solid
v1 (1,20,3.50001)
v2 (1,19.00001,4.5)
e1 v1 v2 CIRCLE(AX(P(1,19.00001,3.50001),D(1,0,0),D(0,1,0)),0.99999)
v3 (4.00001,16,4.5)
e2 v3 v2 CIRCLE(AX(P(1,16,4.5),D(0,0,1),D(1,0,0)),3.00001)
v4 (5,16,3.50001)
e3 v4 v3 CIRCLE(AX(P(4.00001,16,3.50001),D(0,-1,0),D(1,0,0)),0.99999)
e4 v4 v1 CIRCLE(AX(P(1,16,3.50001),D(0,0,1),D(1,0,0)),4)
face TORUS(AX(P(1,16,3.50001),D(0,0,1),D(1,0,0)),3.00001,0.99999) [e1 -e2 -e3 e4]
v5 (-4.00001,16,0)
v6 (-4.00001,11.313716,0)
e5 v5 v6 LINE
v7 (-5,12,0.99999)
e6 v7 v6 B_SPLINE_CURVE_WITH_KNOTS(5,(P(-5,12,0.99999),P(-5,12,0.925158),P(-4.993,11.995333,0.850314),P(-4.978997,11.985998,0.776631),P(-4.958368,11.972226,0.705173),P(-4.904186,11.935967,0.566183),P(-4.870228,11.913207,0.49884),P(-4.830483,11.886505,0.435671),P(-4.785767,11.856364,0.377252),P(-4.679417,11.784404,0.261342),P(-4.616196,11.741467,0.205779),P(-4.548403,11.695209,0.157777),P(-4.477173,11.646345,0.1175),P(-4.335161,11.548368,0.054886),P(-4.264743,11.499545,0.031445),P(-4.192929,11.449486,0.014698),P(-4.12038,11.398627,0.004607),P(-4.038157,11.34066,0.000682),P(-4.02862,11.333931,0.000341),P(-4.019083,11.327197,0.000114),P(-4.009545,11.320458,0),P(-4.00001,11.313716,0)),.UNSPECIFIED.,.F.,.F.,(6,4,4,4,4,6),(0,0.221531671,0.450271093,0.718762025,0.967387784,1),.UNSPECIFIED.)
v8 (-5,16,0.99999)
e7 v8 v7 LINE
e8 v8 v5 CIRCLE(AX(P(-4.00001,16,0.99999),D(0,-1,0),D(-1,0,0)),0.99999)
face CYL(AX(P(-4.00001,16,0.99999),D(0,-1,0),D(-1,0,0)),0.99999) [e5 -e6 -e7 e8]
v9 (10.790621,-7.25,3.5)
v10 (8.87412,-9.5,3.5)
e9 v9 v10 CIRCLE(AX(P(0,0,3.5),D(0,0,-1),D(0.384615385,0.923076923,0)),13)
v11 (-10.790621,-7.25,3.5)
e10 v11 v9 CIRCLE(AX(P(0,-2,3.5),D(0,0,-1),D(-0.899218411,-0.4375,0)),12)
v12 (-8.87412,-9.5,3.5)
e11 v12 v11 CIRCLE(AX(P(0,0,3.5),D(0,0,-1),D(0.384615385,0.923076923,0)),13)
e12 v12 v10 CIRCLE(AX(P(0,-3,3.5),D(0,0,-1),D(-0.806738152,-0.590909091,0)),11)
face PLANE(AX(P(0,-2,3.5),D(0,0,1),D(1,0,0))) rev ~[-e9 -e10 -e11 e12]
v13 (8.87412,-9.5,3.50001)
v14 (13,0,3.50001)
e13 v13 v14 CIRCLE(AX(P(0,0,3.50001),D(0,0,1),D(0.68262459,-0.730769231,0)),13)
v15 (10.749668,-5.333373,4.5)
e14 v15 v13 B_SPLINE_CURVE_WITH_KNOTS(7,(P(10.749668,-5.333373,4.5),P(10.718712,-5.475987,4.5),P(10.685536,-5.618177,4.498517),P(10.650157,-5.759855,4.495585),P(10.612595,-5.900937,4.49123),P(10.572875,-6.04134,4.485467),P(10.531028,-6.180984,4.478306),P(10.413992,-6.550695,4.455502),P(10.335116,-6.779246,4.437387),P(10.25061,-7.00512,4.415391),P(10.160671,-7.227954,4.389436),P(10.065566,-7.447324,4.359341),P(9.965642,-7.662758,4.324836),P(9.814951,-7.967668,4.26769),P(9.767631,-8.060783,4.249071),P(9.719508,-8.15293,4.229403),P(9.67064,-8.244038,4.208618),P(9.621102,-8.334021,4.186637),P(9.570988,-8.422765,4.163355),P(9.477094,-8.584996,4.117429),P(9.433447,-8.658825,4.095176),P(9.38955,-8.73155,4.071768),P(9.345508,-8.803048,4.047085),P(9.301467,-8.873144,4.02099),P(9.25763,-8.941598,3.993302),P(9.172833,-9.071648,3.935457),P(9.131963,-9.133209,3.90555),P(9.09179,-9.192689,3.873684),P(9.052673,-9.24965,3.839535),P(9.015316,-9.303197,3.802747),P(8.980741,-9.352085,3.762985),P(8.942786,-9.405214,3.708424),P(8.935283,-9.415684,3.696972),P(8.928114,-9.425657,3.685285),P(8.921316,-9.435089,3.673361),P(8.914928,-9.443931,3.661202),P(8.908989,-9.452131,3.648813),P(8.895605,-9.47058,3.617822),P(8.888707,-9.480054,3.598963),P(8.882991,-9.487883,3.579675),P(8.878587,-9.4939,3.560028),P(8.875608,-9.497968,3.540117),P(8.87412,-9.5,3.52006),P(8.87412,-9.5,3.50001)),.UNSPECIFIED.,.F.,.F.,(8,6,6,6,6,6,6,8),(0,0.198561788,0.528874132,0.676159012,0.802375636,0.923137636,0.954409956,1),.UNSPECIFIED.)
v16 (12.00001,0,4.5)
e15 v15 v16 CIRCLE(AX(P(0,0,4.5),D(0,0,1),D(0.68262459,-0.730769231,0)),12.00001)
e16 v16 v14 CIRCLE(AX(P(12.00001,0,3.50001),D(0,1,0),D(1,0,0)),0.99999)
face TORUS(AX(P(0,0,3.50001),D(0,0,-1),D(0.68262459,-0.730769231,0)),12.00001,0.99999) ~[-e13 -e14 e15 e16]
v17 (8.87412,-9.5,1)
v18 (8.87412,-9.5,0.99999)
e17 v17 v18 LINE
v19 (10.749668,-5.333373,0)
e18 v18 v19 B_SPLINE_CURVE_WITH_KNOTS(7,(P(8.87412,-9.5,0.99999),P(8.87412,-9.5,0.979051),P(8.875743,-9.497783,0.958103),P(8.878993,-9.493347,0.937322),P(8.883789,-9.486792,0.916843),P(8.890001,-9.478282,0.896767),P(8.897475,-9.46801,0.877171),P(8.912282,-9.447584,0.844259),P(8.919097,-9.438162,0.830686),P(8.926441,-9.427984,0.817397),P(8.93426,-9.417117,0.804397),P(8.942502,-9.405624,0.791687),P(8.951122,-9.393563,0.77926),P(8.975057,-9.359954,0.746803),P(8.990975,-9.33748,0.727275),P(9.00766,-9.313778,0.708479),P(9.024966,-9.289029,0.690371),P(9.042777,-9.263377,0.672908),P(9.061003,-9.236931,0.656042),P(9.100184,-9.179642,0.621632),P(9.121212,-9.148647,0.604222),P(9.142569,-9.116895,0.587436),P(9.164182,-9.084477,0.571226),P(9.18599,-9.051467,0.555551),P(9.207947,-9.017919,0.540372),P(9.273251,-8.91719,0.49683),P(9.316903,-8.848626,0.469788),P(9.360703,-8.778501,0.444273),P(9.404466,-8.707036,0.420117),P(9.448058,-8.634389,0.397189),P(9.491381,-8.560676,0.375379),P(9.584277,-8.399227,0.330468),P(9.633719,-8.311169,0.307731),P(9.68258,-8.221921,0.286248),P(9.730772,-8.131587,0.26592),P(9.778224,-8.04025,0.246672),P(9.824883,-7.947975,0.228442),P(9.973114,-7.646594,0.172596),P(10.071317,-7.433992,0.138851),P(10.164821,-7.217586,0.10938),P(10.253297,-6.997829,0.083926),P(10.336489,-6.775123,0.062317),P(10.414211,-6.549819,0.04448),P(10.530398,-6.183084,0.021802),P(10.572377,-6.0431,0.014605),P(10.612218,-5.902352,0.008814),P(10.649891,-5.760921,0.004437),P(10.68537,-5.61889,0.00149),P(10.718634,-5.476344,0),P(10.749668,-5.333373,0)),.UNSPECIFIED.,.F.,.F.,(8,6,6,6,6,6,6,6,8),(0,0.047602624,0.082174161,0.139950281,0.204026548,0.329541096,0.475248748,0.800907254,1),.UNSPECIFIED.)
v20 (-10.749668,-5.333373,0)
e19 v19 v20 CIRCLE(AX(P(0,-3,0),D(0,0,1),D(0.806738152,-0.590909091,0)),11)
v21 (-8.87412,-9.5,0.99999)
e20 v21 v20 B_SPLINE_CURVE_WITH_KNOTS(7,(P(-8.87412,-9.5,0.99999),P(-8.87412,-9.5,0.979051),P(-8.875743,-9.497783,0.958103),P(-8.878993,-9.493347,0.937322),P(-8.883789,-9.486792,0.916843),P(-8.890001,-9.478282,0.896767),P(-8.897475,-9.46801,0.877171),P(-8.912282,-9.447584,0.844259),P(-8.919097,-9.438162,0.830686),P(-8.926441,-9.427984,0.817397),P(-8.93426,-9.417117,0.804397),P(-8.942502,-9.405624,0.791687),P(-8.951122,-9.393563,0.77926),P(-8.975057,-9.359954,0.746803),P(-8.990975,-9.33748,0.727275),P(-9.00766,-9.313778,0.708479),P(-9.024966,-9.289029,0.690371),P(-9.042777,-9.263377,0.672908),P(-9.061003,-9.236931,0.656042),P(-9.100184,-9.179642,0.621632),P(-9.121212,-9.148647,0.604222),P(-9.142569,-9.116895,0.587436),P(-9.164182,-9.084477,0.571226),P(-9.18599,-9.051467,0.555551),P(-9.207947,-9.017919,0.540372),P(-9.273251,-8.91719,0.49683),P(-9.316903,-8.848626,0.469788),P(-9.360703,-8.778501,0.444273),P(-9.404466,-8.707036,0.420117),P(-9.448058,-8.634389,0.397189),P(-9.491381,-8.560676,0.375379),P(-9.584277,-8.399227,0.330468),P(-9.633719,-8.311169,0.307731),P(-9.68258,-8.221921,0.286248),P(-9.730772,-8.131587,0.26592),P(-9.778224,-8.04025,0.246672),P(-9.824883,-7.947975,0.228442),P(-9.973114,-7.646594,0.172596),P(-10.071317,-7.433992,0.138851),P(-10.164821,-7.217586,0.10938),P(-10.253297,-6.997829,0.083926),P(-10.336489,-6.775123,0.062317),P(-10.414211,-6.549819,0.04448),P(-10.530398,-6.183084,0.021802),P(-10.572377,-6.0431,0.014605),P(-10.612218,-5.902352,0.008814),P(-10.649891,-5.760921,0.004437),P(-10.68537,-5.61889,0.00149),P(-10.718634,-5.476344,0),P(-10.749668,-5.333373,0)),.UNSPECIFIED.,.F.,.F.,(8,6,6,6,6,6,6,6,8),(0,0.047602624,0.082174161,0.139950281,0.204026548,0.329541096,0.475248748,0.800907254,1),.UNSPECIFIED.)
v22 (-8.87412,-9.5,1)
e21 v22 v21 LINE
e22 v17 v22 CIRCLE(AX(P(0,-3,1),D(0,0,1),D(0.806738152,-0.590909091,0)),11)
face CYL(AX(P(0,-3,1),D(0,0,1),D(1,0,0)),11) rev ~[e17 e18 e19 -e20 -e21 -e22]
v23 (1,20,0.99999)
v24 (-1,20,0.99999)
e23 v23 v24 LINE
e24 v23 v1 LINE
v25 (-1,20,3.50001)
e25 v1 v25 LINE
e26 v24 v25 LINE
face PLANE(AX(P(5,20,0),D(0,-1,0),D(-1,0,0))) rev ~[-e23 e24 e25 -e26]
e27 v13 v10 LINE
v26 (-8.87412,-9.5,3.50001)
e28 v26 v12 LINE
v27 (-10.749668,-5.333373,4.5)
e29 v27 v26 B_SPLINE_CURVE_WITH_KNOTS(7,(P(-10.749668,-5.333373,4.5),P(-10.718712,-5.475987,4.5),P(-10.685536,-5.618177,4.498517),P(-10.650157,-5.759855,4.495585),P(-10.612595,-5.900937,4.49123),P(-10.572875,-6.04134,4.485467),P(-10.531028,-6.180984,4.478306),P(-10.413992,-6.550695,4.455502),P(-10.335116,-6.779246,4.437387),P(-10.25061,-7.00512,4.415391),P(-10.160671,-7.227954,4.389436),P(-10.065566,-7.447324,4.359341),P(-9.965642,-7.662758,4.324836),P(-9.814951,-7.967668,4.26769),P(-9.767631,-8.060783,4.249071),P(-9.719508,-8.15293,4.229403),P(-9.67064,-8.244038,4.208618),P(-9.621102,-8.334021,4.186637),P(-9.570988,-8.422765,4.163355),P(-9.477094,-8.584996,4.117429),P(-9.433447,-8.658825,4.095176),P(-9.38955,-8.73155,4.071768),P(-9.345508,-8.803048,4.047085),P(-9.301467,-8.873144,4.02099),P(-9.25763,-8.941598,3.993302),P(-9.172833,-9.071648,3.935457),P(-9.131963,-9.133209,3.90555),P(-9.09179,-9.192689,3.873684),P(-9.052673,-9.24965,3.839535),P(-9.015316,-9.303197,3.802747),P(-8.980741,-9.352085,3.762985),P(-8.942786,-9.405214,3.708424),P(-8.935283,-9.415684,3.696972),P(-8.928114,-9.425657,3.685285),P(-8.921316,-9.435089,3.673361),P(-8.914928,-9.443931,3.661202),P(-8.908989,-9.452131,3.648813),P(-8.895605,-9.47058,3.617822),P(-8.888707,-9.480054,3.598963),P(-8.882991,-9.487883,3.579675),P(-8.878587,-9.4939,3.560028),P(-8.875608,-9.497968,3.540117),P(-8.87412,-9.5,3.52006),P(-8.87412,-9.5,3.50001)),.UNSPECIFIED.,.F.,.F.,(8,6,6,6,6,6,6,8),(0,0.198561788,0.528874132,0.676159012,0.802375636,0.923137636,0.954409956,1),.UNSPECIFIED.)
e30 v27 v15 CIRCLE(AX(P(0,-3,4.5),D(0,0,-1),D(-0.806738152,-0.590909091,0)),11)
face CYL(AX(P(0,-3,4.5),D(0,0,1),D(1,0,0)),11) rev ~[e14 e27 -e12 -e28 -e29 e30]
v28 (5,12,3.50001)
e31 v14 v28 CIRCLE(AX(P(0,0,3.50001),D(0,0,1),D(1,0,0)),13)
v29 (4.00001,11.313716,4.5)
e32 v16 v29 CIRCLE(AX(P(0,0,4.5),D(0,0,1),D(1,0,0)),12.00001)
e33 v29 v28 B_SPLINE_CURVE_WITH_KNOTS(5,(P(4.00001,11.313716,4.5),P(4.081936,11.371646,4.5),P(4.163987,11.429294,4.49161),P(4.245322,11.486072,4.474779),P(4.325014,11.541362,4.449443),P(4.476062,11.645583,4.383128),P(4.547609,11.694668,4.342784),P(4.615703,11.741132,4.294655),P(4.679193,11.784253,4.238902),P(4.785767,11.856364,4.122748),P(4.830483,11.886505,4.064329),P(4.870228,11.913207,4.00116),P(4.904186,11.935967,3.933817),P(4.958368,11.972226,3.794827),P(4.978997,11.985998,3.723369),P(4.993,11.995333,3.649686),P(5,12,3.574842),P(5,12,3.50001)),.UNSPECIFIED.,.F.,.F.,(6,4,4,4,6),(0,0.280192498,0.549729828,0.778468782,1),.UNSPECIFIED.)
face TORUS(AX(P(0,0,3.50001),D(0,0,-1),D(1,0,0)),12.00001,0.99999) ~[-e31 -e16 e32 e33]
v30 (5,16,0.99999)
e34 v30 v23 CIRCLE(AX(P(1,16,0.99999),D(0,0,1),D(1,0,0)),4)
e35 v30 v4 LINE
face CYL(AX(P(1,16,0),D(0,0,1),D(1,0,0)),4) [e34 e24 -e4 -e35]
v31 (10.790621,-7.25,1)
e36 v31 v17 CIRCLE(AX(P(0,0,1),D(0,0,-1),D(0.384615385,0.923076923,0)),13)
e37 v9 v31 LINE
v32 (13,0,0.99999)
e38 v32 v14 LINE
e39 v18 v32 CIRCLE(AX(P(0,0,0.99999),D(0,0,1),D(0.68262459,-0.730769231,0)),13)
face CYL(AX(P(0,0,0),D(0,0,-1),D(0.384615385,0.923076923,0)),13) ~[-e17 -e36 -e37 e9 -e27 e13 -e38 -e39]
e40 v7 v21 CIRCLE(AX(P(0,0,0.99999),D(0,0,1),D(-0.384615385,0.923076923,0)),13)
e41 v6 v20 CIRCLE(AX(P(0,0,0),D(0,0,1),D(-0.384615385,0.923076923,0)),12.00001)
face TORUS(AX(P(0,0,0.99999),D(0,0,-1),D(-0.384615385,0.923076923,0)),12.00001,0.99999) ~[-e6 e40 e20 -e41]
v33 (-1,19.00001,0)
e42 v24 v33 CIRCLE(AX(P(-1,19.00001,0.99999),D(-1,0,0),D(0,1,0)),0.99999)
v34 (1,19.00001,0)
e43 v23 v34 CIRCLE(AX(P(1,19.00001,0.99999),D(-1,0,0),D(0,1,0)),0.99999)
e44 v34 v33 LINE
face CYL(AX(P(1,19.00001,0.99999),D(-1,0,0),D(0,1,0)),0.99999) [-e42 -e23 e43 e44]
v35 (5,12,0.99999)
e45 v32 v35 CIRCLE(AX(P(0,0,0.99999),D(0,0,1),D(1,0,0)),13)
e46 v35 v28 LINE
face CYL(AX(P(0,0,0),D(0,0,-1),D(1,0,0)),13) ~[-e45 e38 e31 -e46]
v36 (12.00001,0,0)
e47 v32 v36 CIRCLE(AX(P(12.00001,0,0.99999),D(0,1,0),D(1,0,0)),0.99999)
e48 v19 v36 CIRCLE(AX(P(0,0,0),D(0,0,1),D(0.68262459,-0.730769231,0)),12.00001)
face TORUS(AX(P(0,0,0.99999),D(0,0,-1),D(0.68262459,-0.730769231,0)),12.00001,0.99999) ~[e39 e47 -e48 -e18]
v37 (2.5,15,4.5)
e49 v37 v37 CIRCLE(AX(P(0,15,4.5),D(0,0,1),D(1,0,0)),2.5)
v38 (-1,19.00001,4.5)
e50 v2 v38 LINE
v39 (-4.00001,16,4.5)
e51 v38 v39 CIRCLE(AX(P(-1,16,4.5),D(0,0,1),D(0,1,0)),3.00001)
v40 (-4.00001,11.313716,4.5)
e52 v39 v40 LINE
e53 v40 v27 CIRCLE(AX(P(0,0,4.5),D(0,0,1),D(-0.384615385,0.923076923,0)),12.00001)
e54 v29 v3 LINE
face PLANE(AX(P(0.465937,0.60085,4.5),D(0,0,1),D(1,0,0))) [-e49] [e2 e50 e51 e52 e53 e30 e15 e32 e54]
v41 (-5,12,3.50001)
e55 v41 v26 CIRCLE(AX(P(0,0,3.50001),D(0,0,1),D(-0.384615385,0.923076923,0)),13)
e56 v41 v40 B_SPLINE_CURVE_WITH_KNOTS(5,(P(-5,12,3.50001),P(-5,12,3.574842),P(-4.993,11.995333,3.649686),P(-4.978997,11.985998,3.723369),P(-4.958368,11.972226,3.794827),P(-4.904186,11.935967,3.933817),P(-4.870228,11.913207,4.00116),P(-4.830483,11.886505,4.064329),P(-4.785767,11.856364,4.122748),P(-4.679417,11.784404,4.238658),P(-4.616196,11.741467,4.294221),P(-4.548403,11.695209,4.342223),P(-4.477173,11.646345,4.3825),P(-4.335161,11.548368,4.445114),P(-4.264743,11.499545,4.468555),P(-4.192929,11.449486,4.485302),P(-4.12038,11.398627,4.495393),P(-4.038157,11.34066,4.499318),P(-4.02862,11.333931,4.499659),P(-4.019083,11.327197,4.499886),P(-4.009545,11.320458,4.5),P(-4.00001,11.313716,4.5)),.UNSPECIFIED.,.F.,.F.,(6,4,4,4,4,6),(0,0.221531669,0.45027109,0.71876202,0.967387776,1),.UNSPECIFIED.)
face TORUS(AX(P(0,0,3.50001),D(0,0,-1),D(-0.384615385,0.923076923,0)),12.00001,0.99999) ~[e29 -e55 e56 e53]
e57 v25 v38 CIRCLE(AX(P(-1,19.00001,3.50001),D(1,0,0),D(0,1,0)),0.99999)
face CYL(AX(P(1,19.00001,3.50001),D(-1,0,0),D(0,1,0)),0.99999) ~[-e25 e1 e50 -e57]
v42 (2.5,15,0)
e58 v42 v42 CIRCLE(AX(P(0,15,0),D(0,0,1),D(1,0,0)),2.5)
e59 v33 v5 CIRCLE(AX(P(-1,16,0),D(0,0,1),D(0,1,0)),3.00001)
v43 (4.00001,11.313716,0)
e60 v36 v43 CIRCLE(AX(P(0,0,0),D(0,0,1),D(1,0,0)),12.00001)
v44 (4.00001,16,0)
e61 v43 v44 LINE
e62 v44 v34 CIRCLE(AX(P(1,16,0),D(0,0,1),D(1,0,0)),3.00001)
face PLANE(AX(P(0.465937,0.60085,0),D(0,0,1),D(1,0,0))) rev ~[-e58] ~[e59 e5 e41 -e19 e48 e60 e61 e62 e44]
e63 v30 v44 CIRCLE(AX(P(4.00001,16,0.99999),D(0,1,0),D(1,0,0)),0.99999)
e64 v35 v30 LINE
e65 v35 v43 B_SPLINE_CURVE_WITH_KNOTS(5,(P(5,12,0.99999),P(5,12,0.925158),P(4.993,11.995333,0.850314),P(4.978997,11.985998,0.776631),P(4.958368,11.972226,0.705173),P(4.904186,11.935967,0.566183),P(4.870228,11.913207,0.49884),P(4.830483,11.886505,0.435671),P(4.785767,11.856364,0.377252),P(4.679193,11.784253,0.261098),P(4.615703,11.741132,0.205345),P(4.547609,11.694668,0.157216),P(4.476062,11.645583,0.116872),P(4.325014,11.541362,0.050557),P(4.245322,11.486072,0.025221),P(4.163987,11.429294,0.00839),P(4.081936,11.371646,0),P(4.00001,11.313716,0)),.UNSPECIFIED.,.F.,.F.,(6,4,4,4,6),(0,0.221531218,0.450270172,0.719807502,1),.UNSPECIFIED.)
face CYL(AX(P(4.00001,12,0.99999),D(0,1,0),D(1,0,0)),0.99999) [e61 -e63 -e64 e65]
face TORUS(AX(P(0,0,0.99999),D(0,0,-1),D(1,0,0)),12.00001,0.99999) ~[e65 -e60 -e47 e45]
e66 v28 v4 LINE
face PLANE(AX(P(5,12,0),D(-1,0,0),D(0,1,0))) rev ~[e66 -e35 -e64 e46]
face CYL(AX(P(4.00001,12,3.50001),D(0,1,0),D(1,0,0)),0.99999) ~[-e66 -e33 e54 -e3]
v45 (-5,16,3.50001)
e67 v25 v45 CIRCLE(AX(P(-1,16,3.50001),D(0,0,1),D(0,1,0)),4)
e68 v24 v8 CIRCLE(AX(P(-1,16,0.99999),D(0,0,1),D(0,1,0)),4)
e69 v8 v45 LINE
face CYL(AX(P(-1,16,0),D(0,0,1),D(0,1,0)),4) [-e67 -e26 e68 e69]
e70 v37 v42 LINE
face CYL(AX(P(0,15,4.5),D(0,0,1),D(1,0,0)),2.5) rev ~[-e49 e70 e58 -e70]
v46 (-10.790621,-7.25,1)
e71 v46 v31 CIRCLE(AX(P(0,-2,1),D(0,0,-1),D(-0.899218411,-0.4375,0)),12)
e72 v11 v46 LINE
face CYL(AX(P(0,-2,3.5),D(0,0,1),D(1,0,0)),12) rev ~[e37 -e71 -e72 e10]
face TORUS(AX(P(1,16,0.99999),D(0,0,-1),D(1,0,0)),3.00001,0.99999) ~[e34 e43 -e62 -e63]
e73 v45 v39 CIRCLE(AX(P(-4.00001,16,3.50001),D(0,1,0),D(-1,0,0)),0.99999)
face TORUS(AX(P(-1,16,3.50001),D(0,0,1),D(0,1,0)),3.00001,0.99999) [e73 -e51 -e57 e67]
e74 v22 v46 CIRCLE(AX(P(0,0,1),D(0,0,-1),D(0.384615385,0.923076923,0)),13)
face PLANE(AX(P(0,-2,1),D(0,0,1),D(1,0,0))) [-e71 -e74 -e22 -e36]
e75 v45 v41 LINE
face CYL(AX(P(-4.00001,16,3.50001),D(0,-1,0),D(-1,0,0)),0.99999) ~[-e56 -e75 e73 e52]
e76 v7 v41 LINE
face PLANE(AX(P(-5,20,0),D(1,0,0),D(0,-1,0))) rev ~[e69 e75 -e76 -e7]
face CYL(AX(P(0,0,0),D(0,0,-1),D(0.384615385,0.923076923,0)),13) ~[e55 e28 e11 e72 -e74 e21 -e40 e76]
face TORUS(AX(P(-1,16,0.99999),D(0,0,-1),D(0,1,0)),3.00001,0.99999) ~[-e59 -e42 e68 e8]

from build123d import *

# Parameters (mm, degrees)
F1_DEPTH  = 4.5
F2_R      = 4
F3_R      = 2.5
F4_DEPTH  = 4.501
F5_R      = 11
F6_DEPTH  = 1
F7_R      = 12
F8_DEPTH  = 2.5
F9_R      = 11
F10_DEPTH = 1.001
F11_R     = 0.99999


# Not quite as in the source:
# - a fillet or chamfer is up to 0.001 mm smaller than in the source, because OpenCascade refuses the exact size


with BuildPart() as f1:
    # F0 (on Top) → F1 (new body)
    with BuildSketch(Plane.XY):
        with BuildLine():
            ThreePointArc((-5, 12), (-7.2111025509, -10.8166538264), (13, 0))
            ThreePointArc((13, 0), (10.8166538264, 7.2111025509), (5, 12))
            Line((5, 12), (-5, 12))
        make_face()
        with BuildLine():
            Line((-5, 12), (5, 12))
            ThreePointArc((5, 12), (0, 13), (-5, 12))
        make_face()
        with BuildLine():
            ThreePointArc((-5, 12), (0, 13), (5, 12))
            Line((5, 12), (5, 20))
            Line((5, 20), (-5, 20))
            Line((-5, 20), (-5, 12))
        make_face()
    extrude(amount=F1_DEPTH)

    # F2
    f2_edges = [f1.edges().sort_by_distance(p)[0] for p in [
        (5, 20, 2.25),
        (-5, 20, 2.25),
    ]]
    fillet(f2_edges, radius=F2_R)

    # F3 (on face) → F4 (cut, through all)
    with BuildSketch(Plane.XY.offset(4.5)):
        with Locations((0, 15)):
            Circle(F3_R)
    extrude(amount=-F4_DEPTH, mode=Mode.SUBTRACT)

    # F5 (on face) → F6 (cut)
    with BuildSketch(Plane.XY.offset(4.5)):
        with Locations((0, -3)):
            Circle(F5_R)
    extrude(amount=-F6_DEPTH, mode=Mode.SUBTRACT)

    # F7 (on face) → F8 (cut)
    with BuildSketch(Plane.XY.offset(3.5)):
        with Locations((0, -2)):
            Circle(F7_R)
    extrude(amount=-F8_DEPTH, mode=Mode.SUBTRACT)

    # F9 (on face) → F10 (cut, through all)
    with BuildSketch(Plane.XY.offset(1)):
        with Locations((0, -3)):
            Circle(F9_R)
    extrude(amount=-F10_DEPTH, mode=Mode.SUBTRACT)

    # F11 (radius 1 in the source; OpenCascade refuses exactly that, so slightly less here)
    f11_edges = [f1.edges().sort_by_distance(p)[0] for p in [
        (12.793956, 2.305363, 4.5),
        (5, 14, 4.5),
        (-12.793956, 2.305363, 4.5),
        (12.793956, 2.305363, 0),
        (-12.793956, 2.305363, 0),
        (-3.828427, 18.828427, 0),
    ]]
    fillet(f11_edges, radius=F11_R)


solid = f1.part
